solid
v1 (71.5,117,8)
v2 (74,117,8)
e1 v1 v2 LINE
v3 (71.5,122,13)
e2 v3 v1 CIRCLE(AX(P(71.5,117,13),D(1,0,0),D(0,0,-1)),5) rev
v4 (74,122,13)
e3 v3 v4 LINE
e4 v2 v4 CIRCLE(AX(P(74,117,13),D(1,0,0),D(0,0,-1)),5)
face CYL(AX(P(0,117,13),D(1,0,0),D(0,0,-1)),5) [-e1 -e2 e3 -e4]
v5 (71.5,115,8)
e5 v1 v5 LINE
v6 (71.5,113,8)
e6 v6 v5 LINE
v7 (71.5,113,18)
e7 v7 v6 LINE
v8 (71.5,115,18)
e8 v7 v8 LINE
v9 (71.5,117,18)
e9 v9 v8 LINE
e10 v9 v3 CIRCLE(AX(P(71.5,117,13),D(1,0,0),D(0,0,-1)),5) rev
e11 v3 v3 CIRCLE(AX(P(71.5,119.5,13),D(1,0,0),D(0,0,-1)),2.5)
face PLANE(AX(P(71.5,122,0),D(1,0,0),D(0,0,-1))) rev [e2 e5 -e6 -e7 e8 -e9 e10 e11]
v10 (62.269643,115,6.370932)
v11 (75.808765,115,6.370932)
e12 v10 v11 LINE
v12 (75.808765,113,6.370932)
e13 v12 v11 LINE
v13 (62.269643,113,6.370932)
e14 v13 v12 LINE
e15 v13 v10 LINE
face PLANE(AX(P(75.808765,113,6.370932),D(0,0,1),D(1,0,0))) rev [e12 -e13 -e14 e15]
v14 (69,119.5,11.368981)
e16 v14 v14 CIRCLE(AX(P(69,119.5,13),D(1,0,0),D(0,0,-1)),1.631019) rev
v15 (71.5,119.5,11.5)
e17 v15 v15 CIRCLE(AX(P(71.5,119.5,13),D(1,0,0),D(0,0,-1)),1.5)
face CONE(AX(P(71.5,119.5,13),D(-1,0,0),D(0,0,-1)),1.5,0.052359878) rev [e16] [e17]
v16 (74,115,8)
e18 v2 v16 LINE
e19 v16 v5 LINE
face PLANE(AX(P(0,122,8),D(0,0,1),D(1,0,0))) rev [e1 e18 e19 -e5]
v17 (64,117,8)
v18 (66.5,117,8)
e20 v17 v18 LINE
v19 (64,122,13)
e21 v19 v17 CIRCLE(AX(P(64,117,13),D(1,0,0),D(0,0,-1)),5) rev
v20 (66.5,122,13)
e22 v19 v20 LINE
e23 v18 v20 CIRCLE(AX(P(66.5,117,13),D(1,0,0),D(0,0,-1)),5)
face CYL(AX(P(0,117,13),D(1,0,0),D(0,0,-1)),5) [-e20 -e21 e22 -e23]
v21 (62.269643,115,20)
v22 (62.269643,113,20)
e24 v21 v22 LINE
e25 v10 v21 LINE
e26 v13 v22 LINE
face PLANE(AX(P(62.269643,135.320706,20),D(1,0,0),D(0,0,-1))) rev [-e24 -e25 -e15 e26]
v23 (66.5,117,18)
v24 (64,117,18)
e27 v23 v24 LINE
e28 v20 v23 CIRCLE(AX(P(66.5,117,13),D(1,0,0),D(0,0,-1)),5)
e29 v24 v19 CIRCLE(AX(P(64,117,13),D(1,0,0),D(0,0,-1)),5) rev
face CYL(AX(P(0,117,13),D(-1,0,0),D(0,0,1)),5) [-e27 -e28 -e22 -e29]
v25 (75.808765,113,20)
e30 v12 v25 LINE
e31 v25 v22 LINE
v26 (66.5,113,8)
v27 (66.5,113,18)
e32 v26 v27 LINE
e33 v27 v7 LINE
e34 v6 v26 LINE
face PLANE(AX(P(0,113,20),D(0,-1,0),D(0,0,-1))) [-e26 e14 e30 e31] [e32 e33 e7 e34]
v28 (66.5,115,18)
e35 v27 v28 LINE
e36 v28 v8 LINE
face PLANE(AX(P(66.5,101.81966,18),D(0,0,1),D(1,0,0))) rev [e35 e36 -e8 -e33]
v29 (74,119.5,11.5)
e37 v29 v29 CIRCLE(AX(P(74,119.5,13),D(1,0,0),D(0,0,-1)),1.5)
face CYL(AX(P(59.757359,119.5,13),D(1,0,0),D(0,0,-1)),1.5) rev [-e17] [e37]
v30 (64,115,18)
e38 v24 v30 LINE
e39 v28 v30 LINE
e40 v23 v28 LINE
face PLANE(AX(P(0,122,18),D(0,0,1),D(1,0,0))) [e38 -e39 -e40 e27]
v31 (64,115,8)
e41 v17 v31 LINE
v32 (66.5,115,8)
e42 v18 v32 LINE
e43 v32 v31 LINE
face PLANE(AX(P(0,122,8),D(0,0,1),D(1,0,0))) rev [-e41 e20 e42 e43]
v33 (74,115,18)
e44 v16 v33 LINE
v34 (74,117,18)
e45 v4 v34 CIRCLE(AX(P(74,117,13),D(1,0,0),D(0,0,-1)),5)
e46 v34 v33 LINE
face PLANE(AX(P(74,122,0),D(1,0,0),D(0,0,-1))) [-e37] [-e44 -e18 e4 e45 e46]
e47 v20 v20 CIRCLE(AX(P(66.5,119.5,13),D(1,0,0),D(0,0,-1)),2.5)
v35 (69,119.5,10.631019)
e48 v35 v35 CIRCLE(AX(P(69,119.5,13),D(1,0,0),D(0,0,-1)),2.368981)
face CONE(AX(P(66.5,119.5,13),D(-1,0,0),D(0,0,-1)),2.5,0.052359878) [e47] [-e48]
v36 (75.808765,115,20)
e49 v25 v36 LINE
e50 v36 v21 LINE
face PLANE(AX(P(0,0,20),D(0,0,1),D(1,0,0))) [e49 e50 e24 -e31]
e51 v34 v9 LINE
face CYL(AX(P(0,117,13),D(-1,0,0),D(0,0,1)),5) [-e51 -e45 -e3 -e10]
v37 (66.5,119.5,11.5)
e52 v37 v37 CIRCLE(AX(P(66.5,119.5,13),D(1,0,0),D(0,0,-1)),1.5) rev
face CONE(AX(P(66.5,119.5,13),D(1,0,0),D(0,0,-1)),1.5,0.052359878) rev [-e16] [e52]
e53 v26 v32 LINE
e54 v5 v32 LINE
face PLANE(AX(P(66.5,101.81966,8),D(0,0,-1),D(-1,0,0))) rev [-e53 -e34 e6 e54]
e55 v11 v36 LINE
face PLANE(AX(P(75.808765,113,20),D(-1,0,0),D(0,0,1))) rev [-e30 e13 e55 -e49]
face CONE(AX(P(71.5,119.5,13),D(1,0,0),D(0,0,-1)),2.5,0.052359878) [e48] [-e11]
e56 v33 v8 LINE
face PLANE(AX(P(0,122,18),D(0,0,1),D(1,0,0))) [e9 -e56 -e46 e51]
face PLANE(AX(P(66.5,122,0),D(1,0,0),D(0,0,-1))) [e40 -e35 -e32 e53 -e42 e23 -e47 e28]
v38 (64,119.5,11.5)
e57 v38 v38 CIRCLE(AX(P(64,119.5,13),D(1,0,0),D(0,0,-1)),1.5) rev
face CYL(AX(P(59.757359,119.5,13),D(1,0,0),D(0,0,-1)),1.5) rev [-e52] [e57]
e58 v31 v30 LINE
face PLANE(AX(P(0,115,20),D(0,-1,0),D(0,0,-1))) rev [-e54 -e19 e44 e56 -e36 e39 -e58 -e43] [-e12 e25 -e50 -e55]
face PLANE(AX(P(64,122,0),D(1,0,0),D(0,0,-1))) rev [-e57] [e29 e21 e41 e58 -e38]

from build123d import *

# Parameters (mm, degrees)
BOSS_EXTRUDE1_DEPTH       = 20
SKETCH2_W                 = 20
SKETCH2_H                 = 30
CUT_EXTRUDE1_DEPTH        = 142.509716981
SHELL1_T                  = -2
SHELL1_THICKNESS_2_FACE_W = 20
SHELL1_THICKNESS_2_FACE_H = 18
SHELL1_THICKNESS_2_DEPTH  = 3
SHELL1_THICKNESS_3_FACE_W = 18
SHELL1_THICKNESS_3_FACE_H = 20
SHELL1_THICKNESS_3_DEPTH  = 3
SKETCH42_W                = 1.26968537
SKETCH42_H                = 30
BOSS_EXTRUDE16_DEPTH      = 15
SKETCH45_W                = 2
SKETCH45_H                = 30
BOSS_EXTRUDE17_DEPTH      = 15
CUT_EXTRUDE15_DEPTH       = 1
CUT_EXTRUDE15_DEPTH_BACK  = 51
SKETCH40_R                = 1.25
SKETCH41_W                = 8
SKETCH41_H                = 20
CUT_EXTRUDE16_DEPTH       = 10
SKETCH44_W                = 1
SKETCH44_H                = 5
CUT_EXTRUDE18_DEPTH       = 18
BOSS_EXTRUDE18_DEPTH      = 15
CUT_EXTRUDE19_DEPTH       = 44.5
CUT_EXTRUDE19_DEPTH_BACK  = 1
SKETCH47_R                = 1.1
SKETCH50_W                = 25
SKETCH50_H                = 2
BOSS_EXTRUDE19_DEPTH      = 15
SKETCH51_W                = 10.975395667
SKETCH51_H                = 2
BOSS_EXTRUDE20_DEPTH      = 15
BOSS_EXTRUDE21_DEPTH      = 5
CUT_EXTRUDE21_DEPTH       = 33.5
CUT_EXTRUDE21_DEPTH_BACK  = 1
SKETCH53_R                = 1.1
CUT_EXTRUDE14_REACH       = 107
SKETCH34_R                = 2.5
SKETCH3_W                 = 2.5
SKETCH3_H                 = 10
BOSS_EXTRUDE2_DEPTH       = 7
FILLET2_R                 = 5
CUT_EXTRUDE3_REACH        = 151.466
SKETCH6_R                 = 1.5
SKETCH21_R                = 2.5
SKETCH21_R_2              = 1.5
BOSS_EXTRUDE10_DEPTH      = 2.5
BOSS_EXTRUDE10_DRAFT      = 3
MIRROR7_COPY_1_SKETCH_R   = 2.5
MIRROR7_COPY_1_SKETCH_R_2 = 1.5
MIRROR7_COPY_1_DEPTH      = 2.5
MIRROR7_COPY_1_DRAFT      = 3
SKETCH26_W                = 5
SKETCH26_H                = 10
CUT_EXTRUDE8_DEPTH        = 2
SKETCH7_W                 = 2.5
SKETCH7_H                 = 10
BOSS_EXTRUDE4_DEPTH       = 5
FILLET4_R                 = 5
SKETCH22_R                = 2.5
BOSS_EXTRUDE11_DEPTH      = 2.5
BOSS_EXTRUDE11_TAPER      = 3
SKETCH23_R                = 1.5
CUT_EXTRUDE7_DEPTH        = 10
CUT_EXTRUDE9_REACH        = 143.51
SKETCH27_W                = 5
SKETCH27_H                = 10
SKETCH10_W                = 2.5
SKETCH10_H                = 10
BOSS_EXTRUDE6_DEPTH       = 5
FILLET6_R                 = 5
SKETCH28_R                = 2.5
BOSS_EXTRUDE12_DEPTH      = 2.5
BOSS_EXTRUDE12_TAPER      = 3
SKETCH29_R                = 1.5
CUT_EXTRUDE10_DEPTH       = 10
CUT_EXTRUDE11_REACH       = 139.477
SKETCH30_W                = 5
SKETCH30_H                = 10
SKETCH13_W                = 2.5
SKETCH13_H                = 10
BOSS_EXTRUDE8_DEPTH       = 5
FILLET8_R                 = 5
SKETCH31_R                = 2.5
BOSS_EXTRUDE13_DEPTH      = 2.5
BOSS_EXTRUDE13_TAPER      = 3
SKETCH32_R                = 1.5
CUT_EXTRUDE12_DEPTH       = 10
SKETCH33_W                = 5
SKETCH33_H                = 10
CUT_EXTRUDE13_DEPTH       = 2
SKETCH55_W                = 107.992137911
SKETCH55_H                = 152.047916128
CUT_EXTRUDE22_DEPTH       = 148.254881074
SKETCH57_W                = 24.522556922
SKETCH57_H                = 115.444687751
CUT_EXTRUDE23_DEPTH       = 148.254881074
CUT_EXTRUDE24_DEPTH       = 83.758685345


with BuildPart() as part:
    # Sketch1 → Boss-Extrude1 (new body)
    with BuildSketch(Plane.XY):
        Polygon((58, 114), (58, 115), (80, 115), (80, 20), (60, 0), (0, 0), (-10, 25), (-10, 105), (11, 105), (11, 110), (12, 110), (34, 110), (34, 115), (35, 115), (57, 115), (57, 114), align=None)
    extrude(amount=BOSS_EXTRUDE1_DEPTH)

    # Sketch2 → Cut-Extrude1 (cut, through all)
    with BuildSketch(Plane.XY.offset(20)):
        with Locations((70, 45)):
            Rectangle(SKETCH2_W, SKETCH2_H)
    extrude(amount=-CUT_EXTRUDE1_DEPTH, mode=Mode.SUBTRACT)

    # Shell1
    shell1_openings = [part.faces().sort_by_distance(p)[0] for p in [
        (33.373630802, 58.203978459, 20),
    ]]
    offset(amount=SHELL1_T, openings=shell1_openings, kind=Kind.INTERSECTION)

    # Shell1 thickness 2 face (on inner face of the shell) → Shell1 thickness 2 (add)
    with BuildSketch(Plane(origin=(68, 28, 11), x_dir=(1, 0, 0), z_dir=(0, 1, 0))):
        Rectangle(SHELL1_THICKNESS_2_FACE_W, SHELL1_THICKNESS_2_FACE_H)
    extrude(amount=-SHELL1_THICKNESS_2_DEPTH)

    # Shell1 thickness 3 face (on inner face of the shell) → Shell1 thickness 3 (add)
    with BuildSketch(Plane(origin=(68, 62, 11), x_dir=(0, 0, -1), z_dir=(0, -1, 0))):
        Rectangle(SHELL1_THICKNESS_3_FACE_W, SHELL1_THICKNESS_3_FACE_H)
    extrude(amount=-SHELL1_THICKNESS_3_DEPTH)

    # Sketch42 → Boss-Extrude16 (add)
    with BuildSketch(Plane.XY.offset(2)):
        with Locations((55.634842685, 97)):
            Rectangle(SKETCH42_W, SKETCH42_H)
    extrude(amount=BOSS_EXTRUDE16_DEPTH)

    # Sketch45 → Boss-Extrude17 (add)
    with BuildSketch(Plane.XY.offset(2)):
        with Locations((31.497271128, 93)):
            Rectangle(SKETCH45_W, SKETCH45_H)
    extrude(amount=BOSS_EXTRUDE17_DEPTH)

    # Sketch40 → Cut-Extrude15 (cut, two sides: drawn at the far end of the back side and taken through both)
    with BuildSketch(Plane(origin=(78, 0, 0), x_dir=(0, 0, -1), z_dir=(1, 0, 0)).offset(-CUT_EXTRUDE15_DEPTH_BACK)):
        with Locations(Location((-13.5, 105, 0), (0, 0, 90))):
            Circle(SKETCH40_R)
    extrude(amount=CUT_EXTRUDE15_DEPTH + CUT_EXTRUDE15_DEPTH_BACK, mode=Mode.SUBTRACT)

    # Sketch41 → Cut-Extrude16 (cut)
    with BuildSketch(Plane.ZY.offset(-58)):
        with Locations((11, 45)):
            Rectangle(SKETCH41_W, SKETCH41_H)
    extrude(amount=-CUT_EXTRUDE16_DEPTH, mode=Mode.SUBTRACT)

    # Sketch44 → Cut-Extrude18 (cut)
    with BuildSketch(Plane.XY.offset(20)):
        with Locations((35.5, 110.5)):
            Rectangle(SKETCH44_W, SKETCH44_H)
    extrude(amount=-CUT_EXTRUDE18_DEPTH, mode=Mode.SUBTRACT)

    # Sketch46 → Boss-Extrude18 (add)
    with BuildSketch(Plane.XY.offset(2)):
        Polygon((12.078813568, 88), (12.078813568, 89), (16.75, 89), (16.75, 79), (15.75, 79), (15.75, 88), align=None)
    extrude(amount=BOSS_EXTRUDE18_DEPTH)

    # Sketch47 → Cut-Extrude19 (cut, two sides: drawn at the far end of the back side and taken through both)
    with BuildSketch(Plane(origin=(-8, 0, 0), x_dir=(0, 0, -1), z_dir=(1, 0, 0)).offset(-CUT_EXTRUDE19_DEPTH_BACK)):
        with Locations(Location((-13.5, 95, 0), (0, 0, 270))):
            Circle(SKETCH47_R)
    extrude(amount=CUT_EXTRUDE19_DEPTH + CUT_EXTRUDE19_DEPTH_BACK, mode=Mode.SUBTRACT)

    # Sketch50 → Boss-Extrude19 (add)
    with BuildSketch(Plane.XY.offset(2)):
        with Locations((45.5, 58.4)):
            Rectangle(SKETCH50_W, SKETCH50_H)
    extrude(amount=BOSS_EXTRUDE19_DEPTH)

    # Sketch51 → Boss-Extrude20 (add)
    with BuildSketch(Plane.XY.offset(2)):
        with Locations((52.512302167, 34)):
            Rectangle(SKETCH51_W, SKETCH51_H)
    extrude(amount=BOSS_EXTRUDE20_DEPTH)

    # Sketch52 → Boss-Extrude21 (add)
    with BuildSketch(Plane.XY.offset(2)):
        Polygon((42.748392928, 49.4), (43.748392928, 49.4), (43.748392928, 44.4), (33.748392928, 44.4), (33.748392928, 45.4), (42.748392928, 45.4), align=None)
        Polygon((40.497271128, 97.212593004), (40.497271128, 98.212593004), (45.497271128, 98.212593004), (45.497271128, 88.212593004), (44.497271128, 88.226881517), (44.497271128, 97.212593004), align=None)
        Polygon((64.269685369, 97.226881517), (64.269685369, 98.226881517), (69.269685369, 98.226881517), (69.269685369, 88.226881517), (68.269685369, 88.226881517), (68.269685369, 97.226881517), align=None)
    extrude(amount=BOSS_EXTRUDE21_DEPTH)

    # Sketch53 → Cut-Extrude21 (cut, two sides: drawn at the far end of the back side and taken through both)
    with BuildSketch(Plane.XZ.offset(-57.4).offset(-CUT_EXTRUDE21_DEPTH_BACK)):
        with Locations(Location((49, 13.5, 0), (0, 0, 270))):
            Circle(SKETCH53_R)
    extrude(amount=CUT_EXTRUDE21_DEPTH + CUT_EXTRUDE21_DEPTH_BACK, mode=Mode.SUBTRACT)

    # Cut-Extrude14: up to this face of the body (flat: up to its plane)
    cut_extrude14_end = Plane(part.part.faces().sort_by_distance((68, 25, 11))[0])
    # Sketch34 → Cut-Extrude14 (cut, up to the picked face)
    with BuildSketch(Plane(origin=(0, 65, 0), x_dir=(1, 0, 0), z_dir=(0, 1, 0)), mode=Mode.PRIVATE) as cut_extrude14_sk1:
        with Locations(Location((70, -11, 0), (0, 0, 270))):
            Circle(SKETCH34_R)
    cut_extrude14_tool1 = split(extrude(cut_extrude14_sk1.sketch, amount=-CUT_EXTRUDE14_REACH, mode=Mode.PRIVATE), bisect_by=cut_extrude14_end, keep=Keep.BOTH, mode=Mode.PRIVATE)
    add(cut_extrude14_tool1.solids().sort_by(Axis((70, 65, 11), (0, -1, 0)))[0], mode=Mode.SUBTRACT)

    # Sketch3 → Boss-Extrude2 (add)
    with BuildSketch(Plane(origin=(0, 115, 0), x_dir=(1, 0, 0), z_dir=(0, 1, 0))):
        with Locations((65.25, -13)):
            Rectangle(SKETCH3_W, SKETCH3_H)
        with Locations((72.75, -13)):
            Rectangle(SKETCH3_W, SKETCH3_H)
    extrude(amount=BOSS_EXTRUDE2_DEPTH)

    # Fillet2
    fillet2_edges = [part.edges().sort_by_distance(p)[0] for p in [
        (65.25, 122, 8),
        (65.25, 122, 18),
        (72.75, 122, 8),
        (72.75, 122, 18),
    ]]
    fillet(fillet2_edges, radius=FILLET2_R - 0.0001)  # a hair under: the kernel refuses the full size

    # Cut-Extrude3: up to this face of the body (flat: up to its plane)
    cut_extrude3_end = Plane(part.part.faces().sort_by_distance((64, 118.068574318, 13))[0])
    # Sketch6 → Cut-Extrude3 (cut, up to the picked face)
    with BuildSketch(Plane(origin=(74, 0, 0), x_dir=(0, 0, -1), z_dir=(1, 0, 0)), mode=Mode.PRIVATE) as cut_extrude3_sk1:
        with Locations((-13, 119.5)):
            Circle(SKETCH6_R)
    cut_extrude3_tool1 = split(extrude(cut_extrude3_sk1.sketch, amount=-CUT_EXTRUDE3_REACH, mode=Mode.PRIVATE), bisect_by=cut_extrude3_end, keep=Keep.BOTH, mode=Mode.PRIVATE)
    add(cut_extrude3_tool1.solids().sort_by(Axis((74, 119.5, 13), (-1, 0, 0)))[0], mode=Mode.SUBTRACT)


with BuildPart() as boss_extrude10_tool:
    # Sketch21 → Boss-Extrude10 (with draft: the straight prism first)
    with BuildSketch(Plane(origin=(66.5, 0, 0), x_dir=(0, 0, -1), z_dir=(1, 0, 0))):
        with Locations((-13, 119.5)):
            Circle(SKETCH21_R)
        with Locations((-13, 119.5)):
            Circle(SKETCH21_R_2, mode=Mode.SUBTRACT)
    extrude(amount=BOSS_EXTRUDE10_DEPTH)
    # Boss-Extrude10: the draft: its side faces are tilted about the plane it starts from
    boss_extrude10_sides = [boss_extrude10_tool.faces().sort_by_distance(p)[0] for p in [
        (67.75, 119.5, 15.5),
        (67.75, 119.5, 14.5),
    ]]
    draft(boss_extrude10_sides, Plane(origin=(66.5, 0, 0), x_dir=(0, 0, -1), z_dir=(1, 0, 0)), BOSS_EXTRUDE10_DRAFT)


with BuildPart() as part_1:
    add(part.part)

    # Boss-Extrude10: add boss_extrude10_tool
    add(boss_extrude10_tool.part)


with BuildPart() as mirror7_copy_1_tool:
    # Mirror7 copy 1 sketch → Mirror7 copy 1 (with draft: the straight prism first)
    with BuildSketch(Plane(origin=(71.5, 0, 0), x_dir=(0, 0, -1), z_dir=(-1, 0, 0))):
        with Locations((-13, -119.5)):
            Circle(MIRROR7_COPY_1_SKETCH_R)
        with Locations((-13, -119.5)):
            Circle(MIRROR7_COPY_1_SKETCH_R_2, mode=Mode.SUBTRACT)
    extrude(amount=MIRROR7_COPY_1_DEPTH)
    # Mirror7 copy 1: the draft: its side faces are tilted about the plane it starts from
    mirror7_copy_1_sides = [mirror7_copy_1_tool.faces().sort_by_distance(p)[0] for p in [
        (70.25, 119.5, 15.5),
        (70.25, 119.5, 14.5),
    ]]
    draft(mirror7_copy_1_sides, Plane(origin=(71.5, 0, 0), x_dir=(0, 0, -1), z_dir=(-1, 0, 0)), MIRROR7_COPY_1_DRAFT)


with BuildPart() as part_2:
    add(part_1.part)

    # Mirror7 copy 1: add mirror7_copy_1_tool
    add(mirror7_copy_1_tool.part)

    # Sketch26 → Cut-Extrude8 (cut)
    with BuildSketch(Plane(origin=(0, 115, 0), x_dir=(1, 0, 0), z_dir=(0, 1, 0))):
        with Locations((69, -13)):
            Rectangle(SKETCH26_W, SKETCH26_H)
    extrude(amount=-CUT_EXTRUDE8_DEPTH, mode=Mode.SUBTRACT)

    # Sketch7 → Boss-Extrude4 (add)
    with BuildSketch(Plane(origin=(0, 115, 0), x_dir=(1, 0, 0), z_dir=(0, 1, 0))):
        with Locations((41.25, -13)):
            Rectangle(SKETCH7_W, SKETCH7_H)
        with Locations((48.75, -13)):
            Rectangle(SKETCH7_W, SKETCH7_H)
    extrude(amount=BOSS_EXTRUDE4_DEPTH)

    # Fillet4
    fillet4_edges = [part_2.edges().sort_by_distance(p)[0] for p in [
        (41.25, 120, 8),
        (41.25, 120, 18),
        (48.75, 120, 8),
        (48.75, 120, 18),
    ]]
    fillet(fillet4_edges, radius=FILLET4_R - 0.0001)  # a hair under: the kernel refuses the full size

    # Sketch22 → Boss-Extrude11 (add)
    with BuildSketch(Plane(origin=(42.5, 0, 0), x_dir=(0, 0, -1), z_dir=(1, 0, 0))):
        with Locations((-13, 117.5)):
            Circle(SKETCH22_R)
    boss_extrude11 = extrude(amount=BOSS_EXTRUDE11_DEPTH, taper=BOSS_EXTRUDE11_TAPER)

    # Mirror8: Boss-Extrude11 across plane
    add(boss_extrude11.mirror(Plane(origin=(45, 117.5, 13), x_dir=(0, 0, 1), z_dir=(1, 0, 0))))

    # Sketch23 → Cut-Extrude7 (cut)
    with BuildSketch(Plane(origin=(50, 0, 0), x_dir=(0, 0, -1), z_dir=(1, 0, 0))):
        with Locations(Location((-13, 117.5, 0), (0, 0, 90))):
            Circle(SKETCH23_R)
    extrude(amount=-CUT_EXTRUDE7_DEPTH, mode=Mode.SUBTRACT)

    # Sketch27 → Cut-Extrude9 (cut, up to next)
    with BuildSketch(Plane(origin=(0, 115, 0), x_dir=(1, 0, 0), z_dir=(0, 1, 0)), mode=Mode.PRIVATE) as cut_extrude9_sk1:
        with Locations((45, -13)):
            Rectangle(SKETCH27_W, SKETCH27_H)
    cut_extrude9_tool1 = extrude(cut_extrude9_sk1.sketch, amount=-CUT_EXTRUDE9_REACH, mode=Mode.PRIVATE) & part_2.part
    add(cut_extrude9_tool1.solids().sort_by_distance((45, 115, 13))[0], mode=Mode.SUBTRACT)

    # Sketch10 → Boss-Extrude6 (add)
    with BuildSketch(Plane(origin=(0, 110, 0), x_dir=(1, 0, 0), z_dir=(0, 1, 0))):
        with Locations((19.25, -13)):
            Rectangle(SKETCH10_W, SKETCH10_H)
        with Locations((26.75, -13)):
            Rectangle(SKETCH10_W, SKETCH10_H)
    extrude(amount=BOSS_EXTRUDE6_DEPTH)

    # Fillet6
    fillet6_edges = [part_2.edges().sort_by_distance(p)[0] for p in [
        (19.25, 115, 18),
        (19.25, 115, 8),
        (26.75, 115, 8),
        (26.75, 115, 18),
    ]]
    fillet(fillet6_edges, radius=FILLET6_R - 0.0001)  # a hair under: the kernel refuses the full size

    # Sketch28 → Boss-Extrude12 (add)
    with BuildSketch(Plane(origin=(20.5, 0, 0), x_dir=(0, 0, -1), z_dir=(1, 0, 0))):
        with Locations((-13, 112.5)):
            Circle(SKETCH28_R)
    boss_extrude12 = extrude(amount=BOSS_EXTRUDE12_DEPTH, taper=BOSS_EXTRUDE12_TAPER)

    # Mirror9: Boss-Extrude12 across plane
    add(boss_extrude12.mirror(Plane(origin=(23, 112.5, 13), x_dir=(0, 0, 1), z_dir=(1, 0, 0))))

    # Sketch29 → Cut-Extrude10 (cut)
    with BuildSketch(Plane(origin=(28, 0, 0), x_dir=(0, 0, -1), z_dir=(1, 0, 0))):
        with Locations((-13, 112.5)):
            Circle(SKETCH29_R)
    extrude(amount=-CUT_EXTRUDE10_DEPTH, mode=Mode.SUBTRACT)

    # Sketch30 → Cut-Extrude11 (cut, up to next)
    with BuildSketch(Plane(origin=(0, 110, 0), x_dir=(1, 0, 0), z_dir=(0, 1, 0)), mode=Mode.PRIVATE) as cut_extrude11_sk1:
        with Locations((23, -13)):
            Rectangle(SKETCH30_W, SKETCH30_H)
    cut_extrude11_tool1 = extrude(cut_extrude11_sk1.sketch, amount=-CUT_EXTRUDE11_REACH, mode=Mode.PRIVATE) & part_2.part
    add(cut_extrude11_tool1.solids().sort_by_distance((23, 110, 13))[0], mode=Mode.SUBTRACT)

    # Sketch13 → Boss-Extrude8 (add)
    with BuildSketch(Plane(origin=(0, 105, 0), x_dir=(1, 0, 0), z_dir=(0, 1, 0))):
        with Locations((-2.75, -13)):
            Rectangle(SKETCH13_W, SKETCH13_H)
        with Locations((4.75, -13)):
            Rectangle(SKETCH13_W, SKETCH13_H)
    extrude(amount=BOSS_EXTRUDE8_DEPTH)

    # Fillet8
    fillet8_edges = [part_2.edges().sort_by_distance(p)[0] for p in [
        (-2.75, 110, 18),
        (-2.75, 110, 8),
        (4.75, 110, 8),
        (4.75, 110, 18),
    ]]
    fillet(fillet8_edges, radius=FILLET8_R - 0.0001)  # a hair under: the kernel refuses the full size

    # Sketch31 → Boss-Extrude13 (add)
    with BuildSketch(Plane(origin=(-1.5, 0, 0), x_dir=(0, 0, -1), z_dir=(1, 0, 0))):
        with Locations((-13, 107.5)):
            Circle(SKETCH31_R)
    boss_extrude13 = extrude(amount=BOSS_EXTRUDE13_DEPTH, taper=BOSS_EXTRUDE13_TAPER)

    # Mirror10: Boss-Extrude13 across plane
    add(boss_extrude13.mirror(Plane(origin=(1, 107.5, 13), x_dir=(0, 0, 1), z_dir=(1, 0, 0))))

    # Sketch32 → Cut-Extrude12 (cut)
    with BuildSketch(Plane(origin=(6, 0, 0), x_dir=(0, 0, -1), z_dir=(1, 0, 0))):
        with Locations((-13, 107.5)):
            Circle(SKETCH32_R)
    extrude(amount=-CUT_EXTRUDE12_DEPTH, mode=Mode.SUBTRACT)

    # Sketch33 → Cut-Extrude13 (cut)
    with BuildSketch(Plane(origin=(0, 105, 0), x_dir=(1, 0, 0), z_dir=(0, 1, 0))):
        with Locations((1, -13)):
            Rectangle(SKETCH33_W, SKETCH33_H)
    extrude(amount=-CUT_EXTRUDE13_DEPTH, mode=Mode.SUBTRACT)

    # Sketch55 → Cut-Extrude22 (cut, through all)
    with BuildSketch(Plane(origin=(0, 0, 0), x_dir=(-1, 0, 0), z_dir=(0, 0, -1))):
        with Locations((-8.273574449, 59.296747854)):
            Rectangle(SKETCH55_W, SKETCH55_H)
    extrude(amount=-CUT_EXTRUDE22_DEPTH, mode=Mode.SUBTRACT)


with BuildPart() as cut_extrude22_piece_1:
    # of the separate pieces the step leaves, piece 1, a body of its own (cut_extrude22_pieces)
    add(part_2.part.solids().sort_by_distance((62.269643405, 60, 0))[0])


with BuildPart() as cut_extrude22_piece_2:
    # of the separate pieces the step leaves, piece 2, a body of its own (cut_extrude22_pieces)
    add(part_2.part.solids().sort_by_distance((62.269643405, 2.269643405, 0))[0])


with BuildPart() as cut_extrude23_tool:
    # Sketch57 → Cut-Extrude23 (new, through all)
    with BuildSketch(Plane(origin=(0, 0, 0), x_dir=(-1, 0, 0), z_dir=(0, 0, -1))):
        with Locations((-74.530921866, 55.277656124)):
            Rectangle(SKETCH57_W, SKETCH57_H)
    extrude(amount=-CUT_EXTRUDE23_DEPTH)


with BuildPart() as cut_extrude22_piece_1_1:
    add(cut_extrude22_piece_1.part)

    # Cut-Extrude23: cut by cut_extrude23_tool
    add(cut_extrude23_tool.part, mode=Mode.SUBTRACT)

    # Sketch58 → Cut-Extrude24 (cut, through all)
    with BuildSketch(Plane(origin=(0, 115, 0), x_dir=(1, 0, 0), z_dir=(0, 1, 0))):
        Polygon((80, 0), (62.269643405, 0), (62.269643405, -6.370932132), (75.808765206, -6.370932132), (75.808765206, -20), (80, -20), (80, -6.370932132), align=None)
    extrude(amount=-CUT_EXTRUDE24_DEPTH, mode=Mode.SUBTRACT)


with BuildPart() as cut_extrude22_piece_2_1:
    add(cut_extrude22_piece_2.part)

    # Cut-Extrude23: cut by cut_extrude23_tool
    add(cut_extrude23_tool.part, mode=Mode.SUBTRACT)


solid = cut_extrude22_piece_1_1.part
